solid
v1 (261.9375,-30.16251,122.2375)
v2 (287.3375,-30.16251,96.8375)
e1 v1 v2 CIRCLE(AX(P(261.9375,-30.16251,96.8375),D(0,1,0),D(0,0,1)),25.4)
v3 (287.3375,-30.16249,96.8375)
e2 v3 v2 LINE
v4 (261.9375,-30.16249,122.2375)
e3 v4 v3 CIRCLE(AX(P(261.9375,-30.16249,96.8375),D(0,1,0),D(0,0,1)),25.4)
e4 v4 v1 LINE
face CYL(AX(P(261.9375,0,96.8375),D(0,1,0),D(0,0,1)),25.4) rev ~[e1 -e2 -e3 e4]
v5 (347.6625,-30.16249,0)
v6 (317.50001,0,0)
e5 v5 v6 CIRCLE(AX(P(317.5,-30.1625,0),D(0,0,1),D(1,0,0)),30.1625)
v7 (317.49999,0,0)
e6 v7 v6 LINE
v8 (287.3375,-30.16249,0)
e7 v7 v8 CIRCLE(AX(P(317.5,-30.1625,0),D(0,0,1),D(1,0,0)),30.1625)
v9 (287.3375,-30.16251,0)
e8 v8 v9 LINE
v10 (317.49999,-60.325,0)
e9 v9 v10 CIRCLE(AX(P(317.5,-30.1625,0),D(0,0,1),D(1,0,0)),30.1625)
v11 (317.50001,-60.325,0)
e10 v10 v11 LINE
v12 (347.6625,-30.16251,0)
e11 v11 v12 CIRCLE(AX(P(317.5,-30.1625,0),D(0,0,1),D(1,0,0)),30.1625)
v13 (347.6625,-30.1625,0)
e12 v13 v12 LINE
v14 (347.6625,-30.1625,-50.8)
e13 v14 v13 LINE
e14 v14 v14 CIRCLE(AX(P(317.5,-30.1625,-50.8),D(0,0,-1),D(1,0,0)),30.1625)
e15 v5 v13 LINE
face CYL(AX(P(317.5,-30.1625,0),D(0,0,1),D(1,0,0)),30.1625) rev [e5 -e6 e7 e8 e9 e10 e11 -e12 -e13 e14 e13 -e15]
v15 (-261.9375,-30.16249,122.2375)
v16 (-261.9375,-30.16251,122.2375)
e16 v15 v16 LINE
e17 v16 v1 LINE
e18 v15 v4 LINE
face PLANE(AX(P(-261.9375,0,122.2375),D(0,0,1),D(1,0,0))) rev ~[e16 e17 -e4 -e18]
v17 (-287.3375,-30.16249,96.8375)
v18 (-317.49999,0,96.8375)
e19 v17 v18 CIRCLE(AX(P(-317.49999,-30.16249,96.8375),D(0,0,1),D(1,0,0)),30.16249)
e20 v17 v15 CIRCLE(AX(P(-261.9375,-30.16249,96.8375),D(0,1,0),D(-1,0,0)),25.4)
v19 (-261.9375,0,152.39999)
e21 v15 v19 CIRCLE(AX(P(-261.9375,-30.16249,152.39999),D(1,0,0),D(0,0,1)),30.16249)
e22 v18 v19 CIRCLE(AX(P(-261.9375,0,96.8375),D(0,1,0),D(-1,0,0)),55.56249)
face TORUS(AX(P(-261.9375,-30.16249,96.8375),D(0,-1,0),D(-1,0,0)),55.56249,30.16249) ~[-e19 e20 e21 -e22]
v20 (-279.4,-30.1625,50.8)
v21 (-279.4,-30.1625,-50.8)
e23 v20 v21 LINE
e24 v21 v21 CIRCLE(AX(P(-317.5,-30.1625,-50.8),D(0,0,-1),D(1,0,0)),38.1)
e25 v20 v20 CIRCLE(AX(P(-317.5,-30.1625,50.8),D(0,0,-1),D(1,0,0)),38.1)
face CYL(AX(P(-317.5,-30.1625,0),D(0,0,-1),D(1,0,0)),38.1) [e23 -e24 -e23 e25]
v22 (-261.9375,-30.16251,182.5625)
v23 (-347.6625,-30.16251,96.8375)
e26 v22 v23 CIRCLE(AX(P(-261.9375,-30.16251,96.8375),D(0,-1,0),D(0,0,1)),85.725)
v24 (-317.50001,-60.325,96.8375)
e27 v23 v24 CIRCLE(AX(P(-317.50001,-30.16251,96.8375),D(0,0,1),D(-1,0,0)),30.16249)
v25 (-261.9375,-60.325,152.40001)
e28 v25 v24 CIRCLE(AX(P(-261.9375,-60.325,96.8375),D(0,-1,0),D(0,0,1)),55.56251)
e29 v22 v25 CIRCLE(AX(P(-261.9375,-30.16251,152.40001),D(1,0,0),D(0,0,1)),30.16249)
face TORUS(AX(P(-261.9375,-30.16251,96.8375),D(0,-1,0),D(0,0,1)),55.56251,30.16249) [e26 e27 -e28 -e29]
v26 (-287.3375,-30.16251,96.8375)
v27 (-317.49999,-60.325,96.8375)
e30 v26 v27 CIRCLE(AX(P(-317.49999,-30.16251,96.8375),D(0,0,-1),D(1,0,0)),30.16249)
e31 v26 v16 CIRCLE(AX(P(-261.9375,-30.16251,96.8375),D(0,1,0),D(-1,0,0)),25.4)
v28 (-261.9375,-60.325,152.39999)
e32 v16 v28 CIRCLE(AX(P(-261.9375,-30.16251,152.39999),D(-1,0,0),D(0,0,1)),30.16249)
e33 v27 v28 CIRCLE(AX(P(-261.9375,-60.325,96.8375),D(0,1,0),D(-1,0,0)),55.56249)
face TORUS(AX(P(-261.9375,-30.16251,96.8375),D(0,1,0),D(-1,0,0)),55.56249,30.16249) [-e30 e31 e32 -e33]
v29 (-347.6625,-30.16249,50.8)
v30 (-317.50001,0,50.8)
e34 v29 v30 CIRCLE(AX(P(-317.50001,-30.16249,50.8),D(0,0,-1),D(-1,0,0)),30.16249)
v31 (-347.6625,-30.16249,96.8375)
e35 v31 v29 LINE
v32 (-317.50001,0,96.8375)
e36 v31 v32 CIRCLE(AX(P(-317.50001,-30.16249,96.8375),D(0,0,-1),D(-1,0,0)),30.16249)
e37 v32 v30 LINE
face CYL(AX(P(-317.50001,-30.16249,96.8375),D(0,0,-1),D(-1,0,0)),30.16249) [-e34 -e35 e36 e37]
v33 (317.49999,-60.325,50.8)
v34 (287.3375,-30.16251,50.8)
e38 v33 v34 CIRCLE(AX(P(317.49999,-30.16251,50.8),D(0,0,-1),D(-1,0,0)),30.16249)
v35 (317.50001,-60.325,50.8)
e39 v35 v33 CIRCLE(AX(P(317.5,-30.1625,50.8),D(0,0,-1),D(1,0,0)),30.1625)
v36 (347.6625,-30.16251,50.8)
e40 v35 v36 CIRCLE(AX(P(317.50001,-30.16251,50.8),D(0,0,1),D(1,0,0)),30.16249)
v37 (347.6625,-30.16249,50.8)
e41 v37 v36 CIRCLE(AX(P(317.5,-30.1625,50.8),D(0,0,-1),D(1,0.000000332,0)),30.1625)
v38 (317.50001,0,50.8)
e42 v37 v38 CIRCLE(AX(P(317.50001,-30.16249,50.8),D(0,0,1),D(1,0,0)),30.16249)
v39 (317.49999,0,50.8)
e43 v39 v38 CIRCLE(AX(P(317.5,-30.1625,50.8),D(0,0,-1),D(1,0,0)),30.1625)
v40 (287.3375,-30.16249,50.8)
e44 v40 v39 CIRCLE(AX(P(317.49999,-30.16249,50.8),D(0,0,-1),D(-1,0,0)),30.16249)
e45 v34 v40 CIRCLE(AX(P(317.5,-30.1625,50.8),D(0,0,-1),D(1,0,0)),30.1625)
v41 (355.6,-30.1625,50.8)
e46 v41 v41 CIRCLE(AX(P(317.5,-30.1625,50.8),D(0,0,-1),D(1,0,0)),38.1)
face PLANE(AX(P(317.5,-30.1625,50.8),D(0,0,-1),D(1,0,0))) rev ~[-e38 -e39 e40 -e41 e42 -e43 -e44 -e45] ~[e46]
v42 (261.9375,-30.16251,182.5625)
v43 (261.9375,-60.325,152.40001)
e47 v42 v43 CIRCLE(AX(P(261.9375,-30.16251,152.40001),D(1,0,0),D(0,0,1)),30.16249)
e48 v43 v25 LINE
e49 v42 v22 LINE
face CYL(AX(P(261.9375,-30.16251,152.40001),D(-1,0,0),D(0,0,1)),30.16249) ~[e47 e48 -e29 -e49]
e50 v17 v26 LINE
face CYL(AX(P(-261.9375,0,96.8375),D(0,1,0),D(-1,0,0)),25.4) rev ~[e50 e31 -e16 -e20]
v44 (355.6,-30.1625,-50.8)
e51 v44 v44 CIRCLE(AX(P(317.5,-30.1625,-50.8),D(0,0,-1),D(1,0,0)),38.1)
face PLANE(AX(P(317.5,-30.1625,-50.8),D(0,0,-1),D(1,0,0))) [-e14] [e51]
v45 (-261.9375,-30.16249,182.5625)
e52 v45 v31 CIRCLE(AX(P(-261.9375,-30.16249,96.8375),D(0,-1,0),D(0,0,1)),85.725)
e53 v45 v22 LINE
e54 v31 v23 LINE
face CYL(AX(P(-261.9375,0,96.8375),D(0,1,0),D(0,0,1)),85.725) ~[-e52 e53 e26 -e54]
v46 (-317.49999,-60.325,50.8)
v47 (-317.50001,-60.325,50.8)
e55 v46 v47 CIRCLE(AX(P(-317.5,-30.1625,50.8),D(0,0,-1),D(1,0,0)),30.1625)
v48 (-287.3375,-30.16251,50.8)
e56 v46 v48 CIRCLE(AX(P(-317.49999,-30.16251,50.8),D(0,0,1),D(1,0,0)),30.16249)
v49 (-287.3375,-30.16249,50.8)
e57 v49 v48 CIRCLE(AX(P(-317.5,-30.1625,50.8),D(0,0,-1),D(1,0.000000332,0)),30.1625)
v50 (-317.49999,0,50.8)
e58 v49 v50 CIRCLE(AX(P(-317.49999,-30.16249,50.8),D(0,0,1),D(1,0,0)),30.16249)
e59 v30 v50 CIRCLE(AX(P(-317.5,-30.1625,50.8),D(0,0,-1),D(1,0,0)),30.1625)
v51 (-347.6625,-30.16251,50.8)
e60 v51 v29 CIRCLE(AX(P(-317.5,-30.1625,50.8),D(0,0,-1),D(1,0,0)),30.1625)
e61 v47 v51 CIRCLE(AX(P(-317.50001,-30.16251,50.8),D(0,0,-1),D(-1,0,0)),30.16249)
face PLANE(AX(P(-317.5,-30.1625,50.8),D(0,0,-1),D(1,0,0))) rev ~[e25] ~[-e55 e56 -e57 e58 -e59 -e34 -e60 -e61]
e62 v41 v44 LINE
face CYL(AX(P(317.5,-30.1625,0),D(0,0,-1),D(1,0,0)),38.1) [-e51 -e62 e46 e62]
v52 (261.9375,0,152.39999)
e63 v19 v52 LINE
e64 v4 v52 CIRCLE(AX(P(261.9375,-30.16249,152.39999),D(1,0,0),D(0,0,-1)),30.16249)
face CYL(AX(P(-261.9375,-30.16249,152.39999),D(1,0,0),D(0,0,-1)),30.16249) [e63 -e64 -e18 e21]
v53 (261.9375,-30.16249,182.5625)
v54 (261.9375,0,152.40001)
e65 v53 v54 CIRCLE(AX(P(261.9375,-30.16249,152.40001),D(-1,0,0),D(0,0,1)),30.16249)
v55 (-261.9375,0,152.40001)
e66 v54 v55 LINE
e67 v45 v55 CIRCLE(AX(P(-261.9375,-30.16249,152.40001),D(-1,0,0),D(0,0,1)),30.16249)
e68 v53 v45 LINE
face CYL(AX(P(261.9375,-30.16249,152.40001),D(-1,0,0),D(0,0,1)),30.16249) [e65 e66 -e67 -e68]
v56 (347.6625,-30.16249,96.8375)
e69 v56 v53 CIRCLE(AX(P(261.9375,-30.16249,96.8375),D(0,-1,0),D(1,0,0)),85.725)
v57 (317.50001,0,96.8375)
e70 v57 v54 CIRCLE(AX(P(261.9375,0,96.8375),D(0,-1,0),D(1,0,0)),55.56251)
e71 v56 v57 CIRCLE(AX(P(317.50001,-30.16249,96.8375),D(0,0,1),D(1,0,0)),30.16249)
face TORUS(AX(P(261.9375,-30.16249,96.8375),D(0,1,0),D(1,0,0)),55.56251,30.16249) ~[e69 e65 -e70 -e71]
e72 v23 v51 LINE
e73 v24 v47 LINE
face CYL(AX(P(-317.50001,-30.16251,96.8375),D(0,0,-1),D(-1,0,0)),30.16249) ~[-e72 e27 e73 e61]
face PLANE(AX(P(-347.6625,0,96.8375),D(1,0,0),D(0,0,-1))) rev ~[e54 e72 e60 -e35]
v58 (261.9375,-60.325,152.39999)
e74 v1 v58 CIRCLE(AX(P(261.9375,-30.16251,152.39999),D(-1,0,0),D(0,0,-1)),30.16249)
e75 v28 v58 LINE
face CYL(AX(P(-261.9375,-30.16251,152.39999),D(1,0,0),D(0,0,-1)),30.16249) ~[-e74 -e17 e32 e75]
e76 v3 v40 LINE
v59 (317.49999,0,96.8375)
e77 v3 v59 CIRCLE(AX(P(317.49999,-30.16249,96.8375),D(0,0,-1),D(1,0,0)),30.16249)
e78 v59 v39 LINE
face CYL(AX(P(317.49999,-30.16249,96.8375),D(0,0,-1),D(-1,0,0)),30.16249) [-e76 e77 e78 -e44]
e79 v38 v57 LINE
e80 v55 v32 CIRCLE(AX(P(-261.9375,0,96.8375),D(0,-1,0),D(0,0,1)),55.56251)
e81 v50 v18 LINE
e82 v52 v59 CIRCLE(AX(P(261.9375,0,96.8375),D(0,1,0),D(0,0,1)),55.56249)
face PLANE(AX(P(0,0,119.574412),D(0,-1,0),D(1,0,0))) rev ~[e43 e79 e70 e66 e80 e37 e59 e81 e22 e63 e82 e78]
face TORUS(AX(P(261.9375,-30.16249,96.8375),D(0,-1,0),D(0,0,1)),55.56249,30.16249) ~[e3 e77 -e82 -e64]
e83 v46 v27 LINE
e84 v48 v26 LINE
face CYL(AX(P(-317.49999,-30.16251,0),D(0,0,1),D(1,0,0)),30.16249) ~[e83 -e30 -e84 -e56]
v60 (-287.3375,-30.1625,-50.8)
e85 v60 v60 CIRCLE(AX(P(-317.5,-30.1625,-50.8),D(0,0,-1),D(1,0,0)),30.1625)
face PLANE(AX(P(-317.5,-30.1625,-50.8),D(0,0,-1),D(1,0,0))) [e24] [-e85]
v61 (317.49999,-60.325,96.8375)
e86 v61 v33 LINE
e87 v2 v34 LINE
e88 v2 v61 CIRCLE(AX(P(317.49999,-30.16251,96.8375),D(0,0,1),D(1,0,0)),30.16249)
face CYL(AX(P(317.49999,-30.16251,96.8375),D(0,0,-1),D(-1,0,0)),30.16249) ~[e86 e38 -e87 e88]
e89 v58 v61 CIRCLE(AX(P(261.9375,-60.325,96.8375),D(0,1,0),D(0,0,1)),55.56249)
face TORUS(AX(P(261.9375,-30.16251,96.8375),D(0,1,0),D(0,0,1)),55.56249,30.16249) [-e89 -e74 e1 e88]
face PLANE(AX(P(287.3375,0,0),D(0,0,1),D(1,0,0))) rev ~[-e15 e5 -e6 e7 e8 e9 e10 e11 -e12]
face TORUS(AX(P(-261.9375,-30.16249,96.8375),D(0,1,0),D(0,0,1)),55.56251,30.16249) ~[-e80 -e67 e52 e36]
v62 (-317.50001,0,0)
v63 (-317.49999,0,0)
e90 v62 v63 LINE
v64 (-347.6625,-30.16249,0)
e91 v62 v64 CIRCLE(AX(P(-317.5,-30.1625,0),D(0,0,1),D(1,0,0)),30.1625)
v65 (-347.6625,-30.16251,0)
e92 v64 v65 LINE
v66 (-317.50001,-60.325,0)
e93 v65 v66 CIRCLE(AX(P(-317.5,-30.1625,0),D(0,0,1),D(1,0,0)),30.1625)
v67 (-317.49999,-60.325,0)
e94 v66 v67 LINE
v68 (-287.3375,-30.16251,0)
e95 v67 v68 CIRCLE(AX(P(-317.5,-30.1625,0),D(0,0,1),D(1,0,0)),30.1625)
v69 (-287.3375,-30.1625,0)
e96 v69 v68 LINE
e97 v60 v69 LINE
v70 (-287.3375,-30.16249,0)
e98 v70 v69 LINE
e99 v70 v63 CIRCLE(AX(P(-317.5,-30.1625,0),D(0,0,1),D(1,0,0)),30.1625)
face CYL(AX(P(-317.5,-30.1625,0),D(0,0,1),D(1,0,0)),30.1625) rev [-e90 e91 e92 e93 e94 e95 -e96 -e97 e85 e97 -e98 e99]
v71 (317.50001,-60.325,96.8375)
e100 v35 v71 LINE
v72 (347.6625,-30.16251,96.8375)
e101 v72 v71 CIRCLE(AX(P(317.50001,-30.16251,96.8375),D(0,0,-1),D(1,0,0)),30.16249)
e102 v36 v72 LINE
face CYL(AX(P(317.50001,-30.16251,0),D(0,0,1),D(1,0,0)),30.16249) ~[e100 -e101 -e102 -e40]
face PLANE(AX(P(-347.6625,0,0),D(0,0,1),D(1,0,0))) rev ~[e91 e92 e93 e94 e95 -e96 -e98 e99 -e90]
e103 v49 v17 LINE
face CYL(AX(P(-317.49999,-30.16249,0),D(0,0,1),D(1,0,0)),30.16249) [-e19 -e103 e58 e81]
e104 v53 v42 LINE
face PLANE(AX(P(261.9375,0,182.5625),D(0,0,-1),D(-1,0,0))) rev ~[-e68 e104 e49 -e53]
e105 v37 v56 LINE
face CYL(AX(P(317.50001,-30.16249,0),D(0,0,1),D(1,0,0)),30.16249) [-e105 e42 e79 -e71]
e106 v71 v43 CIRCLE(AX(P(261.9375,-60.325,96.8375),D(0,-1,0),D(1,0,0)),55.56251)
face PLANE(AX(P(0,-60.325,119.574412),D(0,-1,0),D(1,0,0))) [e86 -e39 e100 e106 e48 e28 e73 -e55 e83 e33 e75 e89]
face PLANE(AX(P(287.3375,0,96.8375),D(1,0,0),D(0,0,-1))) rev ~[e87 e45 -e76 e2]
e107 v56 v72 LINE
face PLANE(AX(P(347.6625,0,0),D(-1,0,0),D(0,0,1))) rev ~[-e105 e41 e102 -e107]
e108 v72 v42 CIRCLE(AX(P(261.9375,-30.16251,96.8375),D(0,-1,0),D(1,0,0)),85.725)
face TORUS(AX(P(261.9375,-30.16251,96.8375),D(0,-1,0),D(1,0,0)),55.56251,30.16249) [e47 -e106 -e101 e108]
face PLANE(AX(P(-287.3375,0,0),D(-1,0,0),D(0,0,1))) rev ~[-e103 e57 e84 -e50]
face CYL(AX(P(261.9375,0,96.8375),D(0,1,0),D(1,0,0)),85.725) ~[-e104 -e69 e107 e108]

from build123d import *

# Parameters (mm, degrees)
F1_DEPTH = 60.325
F2_R     = 30.16249
F3_R     = 38.1
F3_R_2   = 30.1625
F4_DEPTH = 50.8
F5_R     = 38.1
F5_R_2   = 30.1625
F6_DEPTH = 50.8


# Not quite as in the source:
# - a fillet or chamfer is up to 0.001 mm smaller than in the source, because OpenCascade refuses the exact size


with BuildPart() as f1:
    # F0 (on Front) → F1 (new body)
    with BuildSketch(Plane.XZ):
        with BuildLine():
            Line((-347.6625, 0), (-317.5, 0))
            Line((-317.5, 0), (-287.3375, 0))
            Line((-287.3375, 0), (-287.3375, 96.8375))
            ThreePointArc((-287.3375, 96.8375), (-279.8980122421, 114.7980122421), (-261.9375, 122.2375))
            Line((-261.9375, 122.2375), (261.9375, 122.2375))
            ThreePointArc((261.9375, 122.2375), (279.8980122421, 114.7980122421), (287.3375, 96.8375))
            Line((287.3375, 96.8375), (287.3375, 0))
            Line((287.3375, 0), (317.5, 0))
            Line((317.5, 0), (347.6625, 0))
            Line((347.6625, 0), (347.6625, 96.8375))
            ThreePointArc((347.6625, 96.8375), (322.5542288172, 157.4542288172), (261.9375, 182.5625))
            Line((261.9375, 182.5625), (-261.9375, 182.5625))
            ThreePointArc((-261.9375, 182.5625), (-322.5542288172, 157.4542288172), (-347.6625, 96.8375))
            Line((-347.6625, 96.8375), (-347.6625, 0))
        make_face()
    extrude(amount=F1_DEPTH)

    # F2 (radius 30.1625 in the source; OpenCascade refuses exactly that, so slightly less here)
    f2_edges = [f1.edges().sort_by_distance(p)[0] for p in [
        (0, -60.325, 182.5625),
        (0, -60.325, 122.2375),
        (0, 0, 182.5625),
        (0, 0, 122.2375),
    ]]
    fillet(f2_edges, radius=F2_R)

    # F3 (on face) → F4 (join, symmetric)
    with BuildSketch(Plane(origin=(0, 0, 0), x_dir=(1, 0, 0), z_dir=(0, 0, -1))):
        with Locations((-317.5, 30.1625)):
            Circle(F3_R)
        with Locations((-317.5, 30.1625)):
            Circle(F3_R_2, mode=Mode.SUBTRACT)
    extrude(amount=F4_DEPTH, both=True)

    # F5 (on face) → F6 (join, symmetric)
    with BuildSketch(Plane(origin=(0, 0, 0), x_dir=(1, 0, 0), z_dir=(0, 0, -1))):
        with Locations((317.5, 30.1625)):
            Circle(F5_R)
        with Locations((317.5, 30.1625)):
            Circle(F5_R_2, mode=Mode.SUBTRACT)
    extrude(amount=F6_DEPTH, both=True)


solid = f1.part
